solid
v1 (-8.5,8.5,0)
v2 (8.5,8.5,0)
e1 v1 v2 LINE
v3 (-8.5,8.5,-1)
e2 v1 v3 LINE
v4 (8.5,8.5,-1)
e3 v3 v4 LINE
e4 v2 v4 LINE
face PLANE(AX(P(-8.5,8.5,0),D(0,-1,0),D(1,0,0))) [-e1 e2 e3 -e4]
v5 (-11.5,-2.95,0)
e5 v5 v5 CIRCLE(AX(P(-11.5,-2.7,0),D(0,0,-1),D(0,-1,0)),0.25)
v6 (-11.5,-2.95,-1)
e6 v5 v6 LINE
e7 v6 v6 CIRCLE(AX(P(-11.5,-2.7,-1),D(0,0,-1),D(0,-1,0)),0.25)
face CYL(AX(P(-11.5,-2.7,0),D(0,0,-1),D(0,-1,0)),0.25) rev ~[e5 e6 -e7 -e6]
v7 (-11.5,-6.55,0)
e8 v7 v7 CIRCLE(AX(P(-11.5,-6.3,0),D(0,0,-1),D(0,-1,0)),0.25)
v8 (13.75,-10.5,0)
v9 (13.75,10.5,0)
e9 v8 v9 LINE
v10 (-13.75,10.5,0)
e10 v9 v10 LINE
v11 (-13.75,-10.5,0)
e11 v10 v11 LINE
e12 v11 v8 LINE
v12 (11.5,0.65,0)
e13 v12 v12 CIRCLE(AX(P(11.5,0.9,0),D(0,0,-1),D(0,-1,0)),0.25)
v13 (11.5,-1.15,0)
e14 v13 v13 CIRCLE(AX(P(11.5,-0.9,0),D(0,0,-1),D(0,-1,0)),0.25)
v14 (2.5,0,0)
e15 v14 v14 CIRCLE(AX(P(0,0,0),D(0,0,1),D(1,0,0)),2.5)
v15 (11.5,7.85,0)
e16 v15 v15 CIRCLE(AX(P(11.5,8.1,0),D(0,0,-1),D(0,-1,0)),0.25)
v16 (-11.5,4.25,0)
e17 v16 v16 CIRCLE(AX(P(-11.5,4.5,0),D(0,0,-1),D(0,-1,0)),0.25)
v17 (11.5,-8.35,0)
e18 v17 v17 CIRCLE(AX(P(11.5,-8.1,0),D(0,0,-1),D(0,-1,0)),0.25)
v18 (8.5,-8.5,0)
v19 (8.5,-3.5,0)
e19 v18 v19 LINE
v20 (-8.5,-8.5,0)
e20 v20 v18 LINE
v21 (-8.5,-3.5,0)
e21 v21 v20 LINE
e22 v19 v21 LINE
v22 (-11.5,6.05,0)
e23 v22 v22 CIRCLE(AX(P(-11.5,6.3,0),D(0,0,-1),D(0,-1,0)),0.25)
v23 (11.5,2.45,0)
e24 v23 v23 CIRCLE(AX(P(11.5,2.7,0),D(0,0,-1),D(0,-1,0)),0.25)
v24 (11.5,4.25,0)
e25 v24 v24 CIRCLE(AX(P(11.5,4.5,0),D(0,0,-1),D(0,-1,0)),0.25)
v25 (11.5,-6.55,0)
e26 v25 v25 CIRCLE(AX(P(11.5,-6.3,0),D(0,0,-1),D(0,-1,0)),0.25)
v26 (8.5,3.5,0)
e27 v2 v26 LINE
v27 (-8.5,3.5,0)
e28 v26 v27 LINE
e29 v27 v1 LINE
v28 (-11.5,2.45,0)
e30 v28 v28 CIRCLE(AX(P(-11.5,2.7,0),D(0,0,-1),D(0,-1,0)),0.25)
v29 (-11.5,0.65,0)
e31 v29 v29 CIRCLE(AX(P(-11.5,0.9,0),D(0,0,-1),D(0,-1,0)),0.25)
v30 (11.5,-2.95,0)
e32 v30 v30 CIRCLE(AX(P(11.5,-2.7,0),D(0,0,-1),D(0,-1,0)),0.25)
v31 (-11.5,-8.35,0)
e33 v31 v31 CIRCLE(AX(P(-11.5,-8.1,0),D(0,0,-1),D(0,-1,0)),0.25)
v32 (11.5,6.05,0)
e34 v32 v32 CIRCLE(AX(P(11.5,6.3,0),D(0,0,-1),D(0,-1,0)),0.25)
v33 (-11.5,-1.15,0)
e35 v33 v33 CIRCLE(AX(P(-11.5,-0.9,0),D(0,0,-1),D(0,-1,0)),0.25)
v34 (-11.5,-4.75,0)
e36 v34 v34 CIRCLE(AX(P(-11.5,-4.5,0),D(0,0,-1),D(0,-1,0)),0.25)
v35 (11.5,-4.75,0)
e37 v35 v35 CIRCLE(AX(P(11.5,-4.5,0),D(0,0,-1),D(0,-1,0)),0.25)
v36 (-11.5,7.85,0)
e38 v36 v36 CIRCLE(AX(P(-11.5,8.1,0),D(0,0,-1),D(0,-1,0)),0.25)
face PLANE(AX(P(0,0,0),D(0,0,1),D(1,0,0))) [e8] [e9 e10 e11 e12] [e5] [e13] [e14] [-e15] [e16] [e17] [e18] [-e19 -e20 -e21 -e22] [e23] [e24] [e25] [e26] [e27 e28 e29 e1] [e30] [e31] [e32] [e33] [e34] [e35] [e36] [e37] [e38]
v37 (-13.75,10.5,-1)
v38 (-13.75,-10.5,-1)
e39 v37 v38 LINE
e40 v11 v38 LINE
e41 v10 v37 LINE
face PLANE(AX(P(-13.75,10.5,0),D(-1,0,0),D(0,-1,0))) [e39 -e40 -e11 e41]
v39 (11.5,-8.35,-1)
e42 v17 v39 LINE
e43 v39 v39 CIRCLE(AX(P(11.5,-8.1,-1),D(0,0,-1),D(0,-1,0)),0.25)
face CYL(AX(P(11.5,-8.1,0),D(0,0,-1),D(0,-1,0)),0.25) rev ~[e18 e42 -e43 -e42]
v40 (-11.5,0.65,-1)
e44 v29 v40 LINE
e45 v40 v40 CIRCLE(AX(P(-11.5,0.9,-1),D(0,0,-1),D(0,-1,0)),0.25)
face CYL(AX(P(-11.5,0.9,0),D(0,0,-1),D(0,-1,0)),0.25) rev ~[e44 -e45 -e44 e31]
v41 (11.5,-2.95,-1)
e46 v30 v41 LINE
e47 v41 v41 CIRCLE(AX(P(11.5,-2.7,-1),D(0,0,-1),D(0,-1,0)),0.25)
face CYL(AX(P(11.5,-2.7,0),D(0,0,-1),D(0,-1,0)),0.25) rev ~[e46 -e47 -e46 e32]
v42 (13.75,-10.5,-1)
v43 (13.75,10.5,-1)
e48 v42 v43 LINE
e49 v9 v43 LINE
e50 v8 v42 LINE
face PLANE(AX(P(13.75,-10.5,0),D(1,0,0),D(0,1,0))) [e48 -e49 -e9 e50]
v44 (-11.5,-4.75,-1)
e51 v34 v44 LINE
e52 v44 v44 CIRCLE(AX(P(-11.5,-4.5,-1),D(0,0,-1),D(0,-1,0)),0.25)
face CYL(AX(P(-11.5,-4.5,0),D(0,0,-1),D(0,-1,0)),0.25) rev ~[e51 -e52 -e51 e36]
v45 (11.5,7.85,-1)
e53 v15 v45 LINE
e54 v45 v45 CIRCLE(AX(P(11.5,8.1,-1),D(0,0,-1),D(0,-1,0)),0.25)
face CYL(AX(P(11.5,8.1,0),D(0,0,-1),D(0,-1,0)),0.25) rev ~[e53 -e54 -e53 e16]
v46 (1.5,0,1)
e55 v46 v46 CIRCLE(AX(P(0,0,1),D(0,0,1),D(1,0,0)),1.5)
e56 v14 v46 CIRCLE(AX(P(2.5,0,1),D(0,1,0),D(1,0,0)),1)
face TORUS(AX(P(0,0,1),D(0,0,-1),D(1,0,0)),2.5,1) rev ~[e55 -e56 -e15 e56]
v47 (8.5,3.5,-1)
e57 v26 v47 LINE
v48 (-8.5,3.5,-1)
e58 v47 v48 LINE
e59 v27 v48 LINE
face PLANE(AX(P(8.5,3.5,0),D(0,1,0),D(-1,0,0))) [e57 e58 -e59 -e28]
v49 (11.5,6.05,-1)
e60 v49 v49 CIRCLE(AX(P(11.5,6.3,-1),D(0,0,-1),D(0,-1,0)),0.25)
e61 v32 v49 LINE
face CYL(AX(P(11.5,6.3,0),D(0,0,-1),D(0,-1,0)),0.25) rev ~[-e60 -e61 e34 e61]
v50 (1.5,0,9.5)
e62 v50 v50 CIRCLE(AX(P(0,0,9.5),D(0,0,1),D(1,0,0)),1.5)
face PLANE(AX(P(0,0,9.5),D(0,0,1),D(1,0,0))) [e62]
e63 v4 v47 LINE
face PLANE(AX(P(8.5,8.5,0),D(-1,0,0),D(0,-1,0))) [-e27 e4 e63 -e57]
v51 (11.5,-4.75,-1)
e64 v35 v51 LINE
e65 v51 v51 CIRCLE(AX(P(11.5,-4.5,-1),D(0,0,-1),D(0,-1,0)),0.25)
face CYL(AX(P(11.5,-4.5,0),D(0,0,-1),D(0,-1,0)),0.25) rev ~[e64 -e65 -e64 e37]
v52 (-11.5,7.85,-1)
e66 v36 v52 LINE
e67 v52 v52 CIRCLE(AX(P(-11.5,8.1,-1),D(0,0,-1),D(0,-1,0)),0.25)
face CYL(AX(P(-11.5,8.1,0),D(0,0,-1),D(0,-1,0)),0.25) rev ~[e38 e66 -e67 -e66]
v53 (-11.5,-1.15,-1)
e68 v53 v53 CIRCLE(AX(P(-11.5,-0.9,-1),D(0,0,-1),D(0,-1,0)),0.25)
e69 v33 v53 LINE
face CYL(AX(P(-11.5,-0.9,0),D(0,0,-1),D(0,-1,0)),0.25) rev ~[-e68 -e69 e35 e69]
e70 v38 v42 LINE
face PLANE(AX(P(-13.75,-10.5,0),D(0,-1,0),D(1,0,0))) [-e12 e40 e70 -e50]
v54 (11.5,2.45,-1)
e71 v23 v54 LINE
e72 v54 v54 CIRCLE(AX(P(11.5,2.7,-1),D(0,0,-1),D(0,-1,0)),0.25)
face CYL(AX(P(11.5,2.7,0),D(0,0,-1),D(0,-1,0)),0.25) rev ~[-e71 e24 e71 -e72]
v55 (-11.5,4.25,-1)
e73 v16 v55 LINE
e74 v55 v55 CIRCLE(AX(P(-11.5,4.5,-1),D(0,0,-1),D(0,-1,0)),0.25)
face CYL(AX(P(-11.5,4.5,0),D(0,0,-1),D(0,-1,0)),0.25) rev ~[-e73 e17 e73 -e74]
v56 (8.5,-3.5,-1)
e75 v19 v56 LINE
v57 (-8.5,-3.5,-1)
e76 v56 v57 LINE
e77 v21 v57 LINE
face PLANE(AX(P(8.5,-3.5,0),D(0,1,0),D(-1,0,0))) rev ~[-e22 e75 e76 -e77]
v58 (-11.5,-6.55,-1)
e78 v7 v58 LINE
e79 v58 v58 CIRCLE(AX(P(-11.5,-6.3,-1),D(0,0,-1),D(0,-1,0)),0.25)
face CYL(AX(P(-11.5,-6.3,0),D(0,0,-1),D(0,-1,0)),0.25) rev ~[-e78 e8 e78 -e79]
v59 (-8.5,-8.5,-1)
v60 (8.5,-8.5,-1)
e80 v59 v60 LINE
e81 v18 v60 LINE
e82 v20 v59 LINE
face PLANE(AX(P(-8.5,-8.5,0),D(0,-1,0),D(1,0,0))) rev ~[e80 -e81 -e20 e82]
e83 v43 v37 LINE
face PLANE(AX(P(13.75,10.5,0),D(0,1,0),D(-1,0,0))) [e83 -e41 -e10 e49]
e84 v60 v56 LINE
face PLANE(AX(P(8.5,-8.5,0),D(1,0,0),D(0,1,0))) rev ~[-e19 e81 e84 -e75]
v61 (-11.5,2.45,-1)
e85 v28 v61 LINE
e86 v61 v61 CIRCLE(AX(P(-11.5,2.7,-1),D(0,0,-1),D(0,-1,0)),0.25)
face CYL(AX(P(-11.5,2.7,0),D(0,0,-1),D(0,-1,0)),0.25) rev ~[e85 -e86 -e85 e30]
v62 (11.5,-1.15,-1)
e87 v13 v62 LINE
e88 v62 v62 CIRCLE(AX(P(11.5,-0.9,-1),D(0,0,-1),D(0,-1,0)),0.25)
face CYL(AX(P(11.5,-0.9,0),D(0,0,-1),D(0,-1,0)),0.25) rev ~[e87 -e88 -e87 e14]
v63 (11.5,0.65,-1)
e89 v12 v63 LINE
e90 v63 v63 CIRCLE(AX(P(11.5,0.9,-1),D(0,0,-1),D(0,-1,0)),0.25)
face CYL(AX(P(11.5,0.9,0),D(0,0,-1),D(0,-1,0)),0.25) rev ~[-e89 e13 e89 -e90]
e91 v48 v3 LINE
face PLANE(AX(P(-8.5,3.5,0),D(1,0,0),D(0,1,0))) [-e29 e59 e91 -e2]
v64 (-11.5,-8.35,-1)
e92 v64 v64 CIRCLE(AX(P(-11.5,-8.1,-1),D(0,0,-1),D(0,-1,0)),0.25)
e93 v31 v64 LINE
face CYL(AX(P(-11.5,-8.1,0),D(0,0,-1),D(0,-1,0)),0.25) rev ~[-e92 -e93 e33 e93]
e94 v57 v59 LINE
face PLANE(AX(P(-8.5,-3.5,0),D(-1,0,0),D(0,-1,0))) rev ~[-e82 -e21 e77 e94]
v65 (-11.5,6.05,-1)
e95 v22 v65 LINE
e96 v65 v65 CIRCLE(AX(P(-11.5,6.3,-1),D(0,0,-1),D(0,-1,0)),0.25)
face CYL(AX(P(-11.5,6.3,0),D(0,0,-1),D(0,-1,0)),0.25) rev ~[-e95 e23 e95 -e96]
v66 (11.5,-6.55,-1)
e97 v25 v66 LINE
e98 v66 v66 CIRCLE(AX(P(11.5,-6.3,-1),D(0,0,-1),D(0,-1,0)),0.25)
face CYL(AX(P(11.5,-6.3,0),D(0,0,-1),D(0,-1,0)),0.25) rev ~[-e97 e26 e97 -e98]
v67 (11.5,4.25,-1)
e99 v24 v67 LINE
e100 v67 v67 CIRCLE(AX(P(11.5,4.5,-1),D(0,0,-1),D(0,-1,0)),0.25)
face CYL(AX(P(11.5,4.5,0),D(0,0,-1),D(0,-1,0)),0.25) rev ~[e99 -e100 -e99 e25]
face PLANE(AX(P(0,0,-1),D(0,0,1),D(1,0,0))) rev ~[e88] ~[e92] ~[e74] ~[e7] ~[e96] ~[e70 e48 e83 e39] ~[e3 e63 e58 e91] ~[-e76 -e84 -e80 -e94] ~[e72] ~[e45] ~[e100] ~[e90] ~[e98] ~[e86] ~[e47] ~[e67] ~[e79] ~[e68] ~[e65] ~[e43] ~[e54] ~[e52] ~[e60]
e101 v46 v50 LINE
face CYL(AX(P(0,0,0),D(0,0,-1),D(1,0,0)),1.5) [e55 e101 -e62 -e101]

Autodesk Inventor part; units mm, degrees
ref_plane "YZ Plane" through (0, 0, 0) normal (1, 0, 0) x (0, 1, 0)
ref_plane "XZ Plane" through (0, 0, 0) normal (0, 1, 0) x (-1, 0, 0)
ref_plane "XY Plane" through (0, 0, 0) normal (0, 0, 1) x (1, 0, 0)
sketch "Sketch1" plane through (0, 0, 0) normal (0, 0, 1) x (1, 0, 0)
  line L0 (-13.75, -10.5) -> (13.75, -10.5)
  line L1 (13.75, -10.5) -> (13.75, 10.5)
  line L2 (13.75, 10.5) -> (-13.75, 10.5)
  line L3 (-13.75, 10.5) -> (-13.75, -10.5)
  line L4 (-13.75, -10.5) -> (13.75, 10.5) construction
  line L5 (13.75, -10.5) -> (-13.75, 10.5) construction
  line L6 (-8.5, 8.5) -> (8.5, 8.5)
  line L7 (8.5, 8.5) -> (8.5, 3.5)
  line L8 (8.5, 3.5) -> (-8.5, 3.5)
  line L9 (-8.5, 3.5) -> (-8.5, 8.5)
  line L10 (-8.5, 8.5) -> (8.5, 3.5) construction
  line L11 (8.5, 8.5) -> (-8.5, 3.5) construction
  line L12 (-19.25, 0) -> (19.25, 0) construction
  line L13 (-8.5, -8.5) -> (8.5, -8.5)
  line L14 (8.5, -8.5) -> (8.5, -3.5)
  line L15 (8.5, -3.5) -> (-8.5, -3.5)
  line L16 (-8.5, -3.5) -> (-8.5, -8.5)
  line L17 (0, -14.7) -> (0, 14.7) construction
  circle A0 centre (0, 0) radius 1.5
  point P0 (0, 6)
  point P1 (8.5, 6)
  point P2 (11.5, -8.1)
  point P3 (11.5, -6.3)
  point P4 (11.5, -4.5)
  point P5 (11.5, -0.9)
  point P6 (11.5, -2.7)
  point P7 (11.5, 8.1)
  point P8 (11.5, 6.3)
  point P9 (11.5, 4.5)
  point P10 (11.5, 0.9)
  point P11 (11.5, 2.7)
  point P12 (-11.5, -8.1)
  point P13 (-11.5, -6.3)
  point P14 (-11.5, -4.5)
  point P15 (-11.5, -0.9)
  point P16 (-11.5, -2.7)
  point P17 (-11.5, 8.1)
  point P18 (-11.5, 6.3)
  point P19 (-11.5, 4.5)
  point P20 (-11.5, 2.7)
  point P21 (-11.5, 0.9)
  dimension "d0" = 21
  dimension "d1" = 27.5
  dimension "d28" = 17
  dimension "d29" = 5
  dimension "d30" = 2
  dimension "d31" = 1.8
  dimension "d32" = 1.8
  dimension "d33" = 1.8
  dimension "d34" = 1.8
  dimension "d35" = 0.9
  dimension "d36" = 2.25
  dimension "d44" = 3
extrude "Extrusion1" add sketch "Sketch1" against normal blind 1 contours L3 L2 L1 L0 | A0
hole "Hole2" at (11.5, -8.1, 0) at (11.5, -6.3, 0) at (11.5, -4.5, 0) at (11.5, -0.9, 0) at (11.5, -2.7, 0) at (11.5, 8.1, 0) at (11.5, 6.3, 0) at (11.5, 4.5, 0) at (11.5, 2.7, 0) at (11.5, 0.9, 0) at (-11.5, 8.1, 0) at (-11.5, 6.3, 0) at (-11.5, 4.5, 0) at (-11.5, 2.7, 0) at (-11.5, 0.9, 0) at (-11.5, -0.9, 0) at (-11.5, -2.7, 0) at (-11.5, -4.5, 0) at (-11.5, -6.3, 0) at (-11.5, -8.1, 0) direction (0, 0, -1) diameter 0.5 end through all
extrude "Extrusion3" add sketch "Sketch1" along normal blind 9.5 contours A0
thread "Thread3" size "M3x0.5" class "6g" standard "ANSI Metric M Profile" length 4.5
fillet "Fillet3" radius 1 1 edges at (-1.5, 0, 0)
properties part number "Soporte"
